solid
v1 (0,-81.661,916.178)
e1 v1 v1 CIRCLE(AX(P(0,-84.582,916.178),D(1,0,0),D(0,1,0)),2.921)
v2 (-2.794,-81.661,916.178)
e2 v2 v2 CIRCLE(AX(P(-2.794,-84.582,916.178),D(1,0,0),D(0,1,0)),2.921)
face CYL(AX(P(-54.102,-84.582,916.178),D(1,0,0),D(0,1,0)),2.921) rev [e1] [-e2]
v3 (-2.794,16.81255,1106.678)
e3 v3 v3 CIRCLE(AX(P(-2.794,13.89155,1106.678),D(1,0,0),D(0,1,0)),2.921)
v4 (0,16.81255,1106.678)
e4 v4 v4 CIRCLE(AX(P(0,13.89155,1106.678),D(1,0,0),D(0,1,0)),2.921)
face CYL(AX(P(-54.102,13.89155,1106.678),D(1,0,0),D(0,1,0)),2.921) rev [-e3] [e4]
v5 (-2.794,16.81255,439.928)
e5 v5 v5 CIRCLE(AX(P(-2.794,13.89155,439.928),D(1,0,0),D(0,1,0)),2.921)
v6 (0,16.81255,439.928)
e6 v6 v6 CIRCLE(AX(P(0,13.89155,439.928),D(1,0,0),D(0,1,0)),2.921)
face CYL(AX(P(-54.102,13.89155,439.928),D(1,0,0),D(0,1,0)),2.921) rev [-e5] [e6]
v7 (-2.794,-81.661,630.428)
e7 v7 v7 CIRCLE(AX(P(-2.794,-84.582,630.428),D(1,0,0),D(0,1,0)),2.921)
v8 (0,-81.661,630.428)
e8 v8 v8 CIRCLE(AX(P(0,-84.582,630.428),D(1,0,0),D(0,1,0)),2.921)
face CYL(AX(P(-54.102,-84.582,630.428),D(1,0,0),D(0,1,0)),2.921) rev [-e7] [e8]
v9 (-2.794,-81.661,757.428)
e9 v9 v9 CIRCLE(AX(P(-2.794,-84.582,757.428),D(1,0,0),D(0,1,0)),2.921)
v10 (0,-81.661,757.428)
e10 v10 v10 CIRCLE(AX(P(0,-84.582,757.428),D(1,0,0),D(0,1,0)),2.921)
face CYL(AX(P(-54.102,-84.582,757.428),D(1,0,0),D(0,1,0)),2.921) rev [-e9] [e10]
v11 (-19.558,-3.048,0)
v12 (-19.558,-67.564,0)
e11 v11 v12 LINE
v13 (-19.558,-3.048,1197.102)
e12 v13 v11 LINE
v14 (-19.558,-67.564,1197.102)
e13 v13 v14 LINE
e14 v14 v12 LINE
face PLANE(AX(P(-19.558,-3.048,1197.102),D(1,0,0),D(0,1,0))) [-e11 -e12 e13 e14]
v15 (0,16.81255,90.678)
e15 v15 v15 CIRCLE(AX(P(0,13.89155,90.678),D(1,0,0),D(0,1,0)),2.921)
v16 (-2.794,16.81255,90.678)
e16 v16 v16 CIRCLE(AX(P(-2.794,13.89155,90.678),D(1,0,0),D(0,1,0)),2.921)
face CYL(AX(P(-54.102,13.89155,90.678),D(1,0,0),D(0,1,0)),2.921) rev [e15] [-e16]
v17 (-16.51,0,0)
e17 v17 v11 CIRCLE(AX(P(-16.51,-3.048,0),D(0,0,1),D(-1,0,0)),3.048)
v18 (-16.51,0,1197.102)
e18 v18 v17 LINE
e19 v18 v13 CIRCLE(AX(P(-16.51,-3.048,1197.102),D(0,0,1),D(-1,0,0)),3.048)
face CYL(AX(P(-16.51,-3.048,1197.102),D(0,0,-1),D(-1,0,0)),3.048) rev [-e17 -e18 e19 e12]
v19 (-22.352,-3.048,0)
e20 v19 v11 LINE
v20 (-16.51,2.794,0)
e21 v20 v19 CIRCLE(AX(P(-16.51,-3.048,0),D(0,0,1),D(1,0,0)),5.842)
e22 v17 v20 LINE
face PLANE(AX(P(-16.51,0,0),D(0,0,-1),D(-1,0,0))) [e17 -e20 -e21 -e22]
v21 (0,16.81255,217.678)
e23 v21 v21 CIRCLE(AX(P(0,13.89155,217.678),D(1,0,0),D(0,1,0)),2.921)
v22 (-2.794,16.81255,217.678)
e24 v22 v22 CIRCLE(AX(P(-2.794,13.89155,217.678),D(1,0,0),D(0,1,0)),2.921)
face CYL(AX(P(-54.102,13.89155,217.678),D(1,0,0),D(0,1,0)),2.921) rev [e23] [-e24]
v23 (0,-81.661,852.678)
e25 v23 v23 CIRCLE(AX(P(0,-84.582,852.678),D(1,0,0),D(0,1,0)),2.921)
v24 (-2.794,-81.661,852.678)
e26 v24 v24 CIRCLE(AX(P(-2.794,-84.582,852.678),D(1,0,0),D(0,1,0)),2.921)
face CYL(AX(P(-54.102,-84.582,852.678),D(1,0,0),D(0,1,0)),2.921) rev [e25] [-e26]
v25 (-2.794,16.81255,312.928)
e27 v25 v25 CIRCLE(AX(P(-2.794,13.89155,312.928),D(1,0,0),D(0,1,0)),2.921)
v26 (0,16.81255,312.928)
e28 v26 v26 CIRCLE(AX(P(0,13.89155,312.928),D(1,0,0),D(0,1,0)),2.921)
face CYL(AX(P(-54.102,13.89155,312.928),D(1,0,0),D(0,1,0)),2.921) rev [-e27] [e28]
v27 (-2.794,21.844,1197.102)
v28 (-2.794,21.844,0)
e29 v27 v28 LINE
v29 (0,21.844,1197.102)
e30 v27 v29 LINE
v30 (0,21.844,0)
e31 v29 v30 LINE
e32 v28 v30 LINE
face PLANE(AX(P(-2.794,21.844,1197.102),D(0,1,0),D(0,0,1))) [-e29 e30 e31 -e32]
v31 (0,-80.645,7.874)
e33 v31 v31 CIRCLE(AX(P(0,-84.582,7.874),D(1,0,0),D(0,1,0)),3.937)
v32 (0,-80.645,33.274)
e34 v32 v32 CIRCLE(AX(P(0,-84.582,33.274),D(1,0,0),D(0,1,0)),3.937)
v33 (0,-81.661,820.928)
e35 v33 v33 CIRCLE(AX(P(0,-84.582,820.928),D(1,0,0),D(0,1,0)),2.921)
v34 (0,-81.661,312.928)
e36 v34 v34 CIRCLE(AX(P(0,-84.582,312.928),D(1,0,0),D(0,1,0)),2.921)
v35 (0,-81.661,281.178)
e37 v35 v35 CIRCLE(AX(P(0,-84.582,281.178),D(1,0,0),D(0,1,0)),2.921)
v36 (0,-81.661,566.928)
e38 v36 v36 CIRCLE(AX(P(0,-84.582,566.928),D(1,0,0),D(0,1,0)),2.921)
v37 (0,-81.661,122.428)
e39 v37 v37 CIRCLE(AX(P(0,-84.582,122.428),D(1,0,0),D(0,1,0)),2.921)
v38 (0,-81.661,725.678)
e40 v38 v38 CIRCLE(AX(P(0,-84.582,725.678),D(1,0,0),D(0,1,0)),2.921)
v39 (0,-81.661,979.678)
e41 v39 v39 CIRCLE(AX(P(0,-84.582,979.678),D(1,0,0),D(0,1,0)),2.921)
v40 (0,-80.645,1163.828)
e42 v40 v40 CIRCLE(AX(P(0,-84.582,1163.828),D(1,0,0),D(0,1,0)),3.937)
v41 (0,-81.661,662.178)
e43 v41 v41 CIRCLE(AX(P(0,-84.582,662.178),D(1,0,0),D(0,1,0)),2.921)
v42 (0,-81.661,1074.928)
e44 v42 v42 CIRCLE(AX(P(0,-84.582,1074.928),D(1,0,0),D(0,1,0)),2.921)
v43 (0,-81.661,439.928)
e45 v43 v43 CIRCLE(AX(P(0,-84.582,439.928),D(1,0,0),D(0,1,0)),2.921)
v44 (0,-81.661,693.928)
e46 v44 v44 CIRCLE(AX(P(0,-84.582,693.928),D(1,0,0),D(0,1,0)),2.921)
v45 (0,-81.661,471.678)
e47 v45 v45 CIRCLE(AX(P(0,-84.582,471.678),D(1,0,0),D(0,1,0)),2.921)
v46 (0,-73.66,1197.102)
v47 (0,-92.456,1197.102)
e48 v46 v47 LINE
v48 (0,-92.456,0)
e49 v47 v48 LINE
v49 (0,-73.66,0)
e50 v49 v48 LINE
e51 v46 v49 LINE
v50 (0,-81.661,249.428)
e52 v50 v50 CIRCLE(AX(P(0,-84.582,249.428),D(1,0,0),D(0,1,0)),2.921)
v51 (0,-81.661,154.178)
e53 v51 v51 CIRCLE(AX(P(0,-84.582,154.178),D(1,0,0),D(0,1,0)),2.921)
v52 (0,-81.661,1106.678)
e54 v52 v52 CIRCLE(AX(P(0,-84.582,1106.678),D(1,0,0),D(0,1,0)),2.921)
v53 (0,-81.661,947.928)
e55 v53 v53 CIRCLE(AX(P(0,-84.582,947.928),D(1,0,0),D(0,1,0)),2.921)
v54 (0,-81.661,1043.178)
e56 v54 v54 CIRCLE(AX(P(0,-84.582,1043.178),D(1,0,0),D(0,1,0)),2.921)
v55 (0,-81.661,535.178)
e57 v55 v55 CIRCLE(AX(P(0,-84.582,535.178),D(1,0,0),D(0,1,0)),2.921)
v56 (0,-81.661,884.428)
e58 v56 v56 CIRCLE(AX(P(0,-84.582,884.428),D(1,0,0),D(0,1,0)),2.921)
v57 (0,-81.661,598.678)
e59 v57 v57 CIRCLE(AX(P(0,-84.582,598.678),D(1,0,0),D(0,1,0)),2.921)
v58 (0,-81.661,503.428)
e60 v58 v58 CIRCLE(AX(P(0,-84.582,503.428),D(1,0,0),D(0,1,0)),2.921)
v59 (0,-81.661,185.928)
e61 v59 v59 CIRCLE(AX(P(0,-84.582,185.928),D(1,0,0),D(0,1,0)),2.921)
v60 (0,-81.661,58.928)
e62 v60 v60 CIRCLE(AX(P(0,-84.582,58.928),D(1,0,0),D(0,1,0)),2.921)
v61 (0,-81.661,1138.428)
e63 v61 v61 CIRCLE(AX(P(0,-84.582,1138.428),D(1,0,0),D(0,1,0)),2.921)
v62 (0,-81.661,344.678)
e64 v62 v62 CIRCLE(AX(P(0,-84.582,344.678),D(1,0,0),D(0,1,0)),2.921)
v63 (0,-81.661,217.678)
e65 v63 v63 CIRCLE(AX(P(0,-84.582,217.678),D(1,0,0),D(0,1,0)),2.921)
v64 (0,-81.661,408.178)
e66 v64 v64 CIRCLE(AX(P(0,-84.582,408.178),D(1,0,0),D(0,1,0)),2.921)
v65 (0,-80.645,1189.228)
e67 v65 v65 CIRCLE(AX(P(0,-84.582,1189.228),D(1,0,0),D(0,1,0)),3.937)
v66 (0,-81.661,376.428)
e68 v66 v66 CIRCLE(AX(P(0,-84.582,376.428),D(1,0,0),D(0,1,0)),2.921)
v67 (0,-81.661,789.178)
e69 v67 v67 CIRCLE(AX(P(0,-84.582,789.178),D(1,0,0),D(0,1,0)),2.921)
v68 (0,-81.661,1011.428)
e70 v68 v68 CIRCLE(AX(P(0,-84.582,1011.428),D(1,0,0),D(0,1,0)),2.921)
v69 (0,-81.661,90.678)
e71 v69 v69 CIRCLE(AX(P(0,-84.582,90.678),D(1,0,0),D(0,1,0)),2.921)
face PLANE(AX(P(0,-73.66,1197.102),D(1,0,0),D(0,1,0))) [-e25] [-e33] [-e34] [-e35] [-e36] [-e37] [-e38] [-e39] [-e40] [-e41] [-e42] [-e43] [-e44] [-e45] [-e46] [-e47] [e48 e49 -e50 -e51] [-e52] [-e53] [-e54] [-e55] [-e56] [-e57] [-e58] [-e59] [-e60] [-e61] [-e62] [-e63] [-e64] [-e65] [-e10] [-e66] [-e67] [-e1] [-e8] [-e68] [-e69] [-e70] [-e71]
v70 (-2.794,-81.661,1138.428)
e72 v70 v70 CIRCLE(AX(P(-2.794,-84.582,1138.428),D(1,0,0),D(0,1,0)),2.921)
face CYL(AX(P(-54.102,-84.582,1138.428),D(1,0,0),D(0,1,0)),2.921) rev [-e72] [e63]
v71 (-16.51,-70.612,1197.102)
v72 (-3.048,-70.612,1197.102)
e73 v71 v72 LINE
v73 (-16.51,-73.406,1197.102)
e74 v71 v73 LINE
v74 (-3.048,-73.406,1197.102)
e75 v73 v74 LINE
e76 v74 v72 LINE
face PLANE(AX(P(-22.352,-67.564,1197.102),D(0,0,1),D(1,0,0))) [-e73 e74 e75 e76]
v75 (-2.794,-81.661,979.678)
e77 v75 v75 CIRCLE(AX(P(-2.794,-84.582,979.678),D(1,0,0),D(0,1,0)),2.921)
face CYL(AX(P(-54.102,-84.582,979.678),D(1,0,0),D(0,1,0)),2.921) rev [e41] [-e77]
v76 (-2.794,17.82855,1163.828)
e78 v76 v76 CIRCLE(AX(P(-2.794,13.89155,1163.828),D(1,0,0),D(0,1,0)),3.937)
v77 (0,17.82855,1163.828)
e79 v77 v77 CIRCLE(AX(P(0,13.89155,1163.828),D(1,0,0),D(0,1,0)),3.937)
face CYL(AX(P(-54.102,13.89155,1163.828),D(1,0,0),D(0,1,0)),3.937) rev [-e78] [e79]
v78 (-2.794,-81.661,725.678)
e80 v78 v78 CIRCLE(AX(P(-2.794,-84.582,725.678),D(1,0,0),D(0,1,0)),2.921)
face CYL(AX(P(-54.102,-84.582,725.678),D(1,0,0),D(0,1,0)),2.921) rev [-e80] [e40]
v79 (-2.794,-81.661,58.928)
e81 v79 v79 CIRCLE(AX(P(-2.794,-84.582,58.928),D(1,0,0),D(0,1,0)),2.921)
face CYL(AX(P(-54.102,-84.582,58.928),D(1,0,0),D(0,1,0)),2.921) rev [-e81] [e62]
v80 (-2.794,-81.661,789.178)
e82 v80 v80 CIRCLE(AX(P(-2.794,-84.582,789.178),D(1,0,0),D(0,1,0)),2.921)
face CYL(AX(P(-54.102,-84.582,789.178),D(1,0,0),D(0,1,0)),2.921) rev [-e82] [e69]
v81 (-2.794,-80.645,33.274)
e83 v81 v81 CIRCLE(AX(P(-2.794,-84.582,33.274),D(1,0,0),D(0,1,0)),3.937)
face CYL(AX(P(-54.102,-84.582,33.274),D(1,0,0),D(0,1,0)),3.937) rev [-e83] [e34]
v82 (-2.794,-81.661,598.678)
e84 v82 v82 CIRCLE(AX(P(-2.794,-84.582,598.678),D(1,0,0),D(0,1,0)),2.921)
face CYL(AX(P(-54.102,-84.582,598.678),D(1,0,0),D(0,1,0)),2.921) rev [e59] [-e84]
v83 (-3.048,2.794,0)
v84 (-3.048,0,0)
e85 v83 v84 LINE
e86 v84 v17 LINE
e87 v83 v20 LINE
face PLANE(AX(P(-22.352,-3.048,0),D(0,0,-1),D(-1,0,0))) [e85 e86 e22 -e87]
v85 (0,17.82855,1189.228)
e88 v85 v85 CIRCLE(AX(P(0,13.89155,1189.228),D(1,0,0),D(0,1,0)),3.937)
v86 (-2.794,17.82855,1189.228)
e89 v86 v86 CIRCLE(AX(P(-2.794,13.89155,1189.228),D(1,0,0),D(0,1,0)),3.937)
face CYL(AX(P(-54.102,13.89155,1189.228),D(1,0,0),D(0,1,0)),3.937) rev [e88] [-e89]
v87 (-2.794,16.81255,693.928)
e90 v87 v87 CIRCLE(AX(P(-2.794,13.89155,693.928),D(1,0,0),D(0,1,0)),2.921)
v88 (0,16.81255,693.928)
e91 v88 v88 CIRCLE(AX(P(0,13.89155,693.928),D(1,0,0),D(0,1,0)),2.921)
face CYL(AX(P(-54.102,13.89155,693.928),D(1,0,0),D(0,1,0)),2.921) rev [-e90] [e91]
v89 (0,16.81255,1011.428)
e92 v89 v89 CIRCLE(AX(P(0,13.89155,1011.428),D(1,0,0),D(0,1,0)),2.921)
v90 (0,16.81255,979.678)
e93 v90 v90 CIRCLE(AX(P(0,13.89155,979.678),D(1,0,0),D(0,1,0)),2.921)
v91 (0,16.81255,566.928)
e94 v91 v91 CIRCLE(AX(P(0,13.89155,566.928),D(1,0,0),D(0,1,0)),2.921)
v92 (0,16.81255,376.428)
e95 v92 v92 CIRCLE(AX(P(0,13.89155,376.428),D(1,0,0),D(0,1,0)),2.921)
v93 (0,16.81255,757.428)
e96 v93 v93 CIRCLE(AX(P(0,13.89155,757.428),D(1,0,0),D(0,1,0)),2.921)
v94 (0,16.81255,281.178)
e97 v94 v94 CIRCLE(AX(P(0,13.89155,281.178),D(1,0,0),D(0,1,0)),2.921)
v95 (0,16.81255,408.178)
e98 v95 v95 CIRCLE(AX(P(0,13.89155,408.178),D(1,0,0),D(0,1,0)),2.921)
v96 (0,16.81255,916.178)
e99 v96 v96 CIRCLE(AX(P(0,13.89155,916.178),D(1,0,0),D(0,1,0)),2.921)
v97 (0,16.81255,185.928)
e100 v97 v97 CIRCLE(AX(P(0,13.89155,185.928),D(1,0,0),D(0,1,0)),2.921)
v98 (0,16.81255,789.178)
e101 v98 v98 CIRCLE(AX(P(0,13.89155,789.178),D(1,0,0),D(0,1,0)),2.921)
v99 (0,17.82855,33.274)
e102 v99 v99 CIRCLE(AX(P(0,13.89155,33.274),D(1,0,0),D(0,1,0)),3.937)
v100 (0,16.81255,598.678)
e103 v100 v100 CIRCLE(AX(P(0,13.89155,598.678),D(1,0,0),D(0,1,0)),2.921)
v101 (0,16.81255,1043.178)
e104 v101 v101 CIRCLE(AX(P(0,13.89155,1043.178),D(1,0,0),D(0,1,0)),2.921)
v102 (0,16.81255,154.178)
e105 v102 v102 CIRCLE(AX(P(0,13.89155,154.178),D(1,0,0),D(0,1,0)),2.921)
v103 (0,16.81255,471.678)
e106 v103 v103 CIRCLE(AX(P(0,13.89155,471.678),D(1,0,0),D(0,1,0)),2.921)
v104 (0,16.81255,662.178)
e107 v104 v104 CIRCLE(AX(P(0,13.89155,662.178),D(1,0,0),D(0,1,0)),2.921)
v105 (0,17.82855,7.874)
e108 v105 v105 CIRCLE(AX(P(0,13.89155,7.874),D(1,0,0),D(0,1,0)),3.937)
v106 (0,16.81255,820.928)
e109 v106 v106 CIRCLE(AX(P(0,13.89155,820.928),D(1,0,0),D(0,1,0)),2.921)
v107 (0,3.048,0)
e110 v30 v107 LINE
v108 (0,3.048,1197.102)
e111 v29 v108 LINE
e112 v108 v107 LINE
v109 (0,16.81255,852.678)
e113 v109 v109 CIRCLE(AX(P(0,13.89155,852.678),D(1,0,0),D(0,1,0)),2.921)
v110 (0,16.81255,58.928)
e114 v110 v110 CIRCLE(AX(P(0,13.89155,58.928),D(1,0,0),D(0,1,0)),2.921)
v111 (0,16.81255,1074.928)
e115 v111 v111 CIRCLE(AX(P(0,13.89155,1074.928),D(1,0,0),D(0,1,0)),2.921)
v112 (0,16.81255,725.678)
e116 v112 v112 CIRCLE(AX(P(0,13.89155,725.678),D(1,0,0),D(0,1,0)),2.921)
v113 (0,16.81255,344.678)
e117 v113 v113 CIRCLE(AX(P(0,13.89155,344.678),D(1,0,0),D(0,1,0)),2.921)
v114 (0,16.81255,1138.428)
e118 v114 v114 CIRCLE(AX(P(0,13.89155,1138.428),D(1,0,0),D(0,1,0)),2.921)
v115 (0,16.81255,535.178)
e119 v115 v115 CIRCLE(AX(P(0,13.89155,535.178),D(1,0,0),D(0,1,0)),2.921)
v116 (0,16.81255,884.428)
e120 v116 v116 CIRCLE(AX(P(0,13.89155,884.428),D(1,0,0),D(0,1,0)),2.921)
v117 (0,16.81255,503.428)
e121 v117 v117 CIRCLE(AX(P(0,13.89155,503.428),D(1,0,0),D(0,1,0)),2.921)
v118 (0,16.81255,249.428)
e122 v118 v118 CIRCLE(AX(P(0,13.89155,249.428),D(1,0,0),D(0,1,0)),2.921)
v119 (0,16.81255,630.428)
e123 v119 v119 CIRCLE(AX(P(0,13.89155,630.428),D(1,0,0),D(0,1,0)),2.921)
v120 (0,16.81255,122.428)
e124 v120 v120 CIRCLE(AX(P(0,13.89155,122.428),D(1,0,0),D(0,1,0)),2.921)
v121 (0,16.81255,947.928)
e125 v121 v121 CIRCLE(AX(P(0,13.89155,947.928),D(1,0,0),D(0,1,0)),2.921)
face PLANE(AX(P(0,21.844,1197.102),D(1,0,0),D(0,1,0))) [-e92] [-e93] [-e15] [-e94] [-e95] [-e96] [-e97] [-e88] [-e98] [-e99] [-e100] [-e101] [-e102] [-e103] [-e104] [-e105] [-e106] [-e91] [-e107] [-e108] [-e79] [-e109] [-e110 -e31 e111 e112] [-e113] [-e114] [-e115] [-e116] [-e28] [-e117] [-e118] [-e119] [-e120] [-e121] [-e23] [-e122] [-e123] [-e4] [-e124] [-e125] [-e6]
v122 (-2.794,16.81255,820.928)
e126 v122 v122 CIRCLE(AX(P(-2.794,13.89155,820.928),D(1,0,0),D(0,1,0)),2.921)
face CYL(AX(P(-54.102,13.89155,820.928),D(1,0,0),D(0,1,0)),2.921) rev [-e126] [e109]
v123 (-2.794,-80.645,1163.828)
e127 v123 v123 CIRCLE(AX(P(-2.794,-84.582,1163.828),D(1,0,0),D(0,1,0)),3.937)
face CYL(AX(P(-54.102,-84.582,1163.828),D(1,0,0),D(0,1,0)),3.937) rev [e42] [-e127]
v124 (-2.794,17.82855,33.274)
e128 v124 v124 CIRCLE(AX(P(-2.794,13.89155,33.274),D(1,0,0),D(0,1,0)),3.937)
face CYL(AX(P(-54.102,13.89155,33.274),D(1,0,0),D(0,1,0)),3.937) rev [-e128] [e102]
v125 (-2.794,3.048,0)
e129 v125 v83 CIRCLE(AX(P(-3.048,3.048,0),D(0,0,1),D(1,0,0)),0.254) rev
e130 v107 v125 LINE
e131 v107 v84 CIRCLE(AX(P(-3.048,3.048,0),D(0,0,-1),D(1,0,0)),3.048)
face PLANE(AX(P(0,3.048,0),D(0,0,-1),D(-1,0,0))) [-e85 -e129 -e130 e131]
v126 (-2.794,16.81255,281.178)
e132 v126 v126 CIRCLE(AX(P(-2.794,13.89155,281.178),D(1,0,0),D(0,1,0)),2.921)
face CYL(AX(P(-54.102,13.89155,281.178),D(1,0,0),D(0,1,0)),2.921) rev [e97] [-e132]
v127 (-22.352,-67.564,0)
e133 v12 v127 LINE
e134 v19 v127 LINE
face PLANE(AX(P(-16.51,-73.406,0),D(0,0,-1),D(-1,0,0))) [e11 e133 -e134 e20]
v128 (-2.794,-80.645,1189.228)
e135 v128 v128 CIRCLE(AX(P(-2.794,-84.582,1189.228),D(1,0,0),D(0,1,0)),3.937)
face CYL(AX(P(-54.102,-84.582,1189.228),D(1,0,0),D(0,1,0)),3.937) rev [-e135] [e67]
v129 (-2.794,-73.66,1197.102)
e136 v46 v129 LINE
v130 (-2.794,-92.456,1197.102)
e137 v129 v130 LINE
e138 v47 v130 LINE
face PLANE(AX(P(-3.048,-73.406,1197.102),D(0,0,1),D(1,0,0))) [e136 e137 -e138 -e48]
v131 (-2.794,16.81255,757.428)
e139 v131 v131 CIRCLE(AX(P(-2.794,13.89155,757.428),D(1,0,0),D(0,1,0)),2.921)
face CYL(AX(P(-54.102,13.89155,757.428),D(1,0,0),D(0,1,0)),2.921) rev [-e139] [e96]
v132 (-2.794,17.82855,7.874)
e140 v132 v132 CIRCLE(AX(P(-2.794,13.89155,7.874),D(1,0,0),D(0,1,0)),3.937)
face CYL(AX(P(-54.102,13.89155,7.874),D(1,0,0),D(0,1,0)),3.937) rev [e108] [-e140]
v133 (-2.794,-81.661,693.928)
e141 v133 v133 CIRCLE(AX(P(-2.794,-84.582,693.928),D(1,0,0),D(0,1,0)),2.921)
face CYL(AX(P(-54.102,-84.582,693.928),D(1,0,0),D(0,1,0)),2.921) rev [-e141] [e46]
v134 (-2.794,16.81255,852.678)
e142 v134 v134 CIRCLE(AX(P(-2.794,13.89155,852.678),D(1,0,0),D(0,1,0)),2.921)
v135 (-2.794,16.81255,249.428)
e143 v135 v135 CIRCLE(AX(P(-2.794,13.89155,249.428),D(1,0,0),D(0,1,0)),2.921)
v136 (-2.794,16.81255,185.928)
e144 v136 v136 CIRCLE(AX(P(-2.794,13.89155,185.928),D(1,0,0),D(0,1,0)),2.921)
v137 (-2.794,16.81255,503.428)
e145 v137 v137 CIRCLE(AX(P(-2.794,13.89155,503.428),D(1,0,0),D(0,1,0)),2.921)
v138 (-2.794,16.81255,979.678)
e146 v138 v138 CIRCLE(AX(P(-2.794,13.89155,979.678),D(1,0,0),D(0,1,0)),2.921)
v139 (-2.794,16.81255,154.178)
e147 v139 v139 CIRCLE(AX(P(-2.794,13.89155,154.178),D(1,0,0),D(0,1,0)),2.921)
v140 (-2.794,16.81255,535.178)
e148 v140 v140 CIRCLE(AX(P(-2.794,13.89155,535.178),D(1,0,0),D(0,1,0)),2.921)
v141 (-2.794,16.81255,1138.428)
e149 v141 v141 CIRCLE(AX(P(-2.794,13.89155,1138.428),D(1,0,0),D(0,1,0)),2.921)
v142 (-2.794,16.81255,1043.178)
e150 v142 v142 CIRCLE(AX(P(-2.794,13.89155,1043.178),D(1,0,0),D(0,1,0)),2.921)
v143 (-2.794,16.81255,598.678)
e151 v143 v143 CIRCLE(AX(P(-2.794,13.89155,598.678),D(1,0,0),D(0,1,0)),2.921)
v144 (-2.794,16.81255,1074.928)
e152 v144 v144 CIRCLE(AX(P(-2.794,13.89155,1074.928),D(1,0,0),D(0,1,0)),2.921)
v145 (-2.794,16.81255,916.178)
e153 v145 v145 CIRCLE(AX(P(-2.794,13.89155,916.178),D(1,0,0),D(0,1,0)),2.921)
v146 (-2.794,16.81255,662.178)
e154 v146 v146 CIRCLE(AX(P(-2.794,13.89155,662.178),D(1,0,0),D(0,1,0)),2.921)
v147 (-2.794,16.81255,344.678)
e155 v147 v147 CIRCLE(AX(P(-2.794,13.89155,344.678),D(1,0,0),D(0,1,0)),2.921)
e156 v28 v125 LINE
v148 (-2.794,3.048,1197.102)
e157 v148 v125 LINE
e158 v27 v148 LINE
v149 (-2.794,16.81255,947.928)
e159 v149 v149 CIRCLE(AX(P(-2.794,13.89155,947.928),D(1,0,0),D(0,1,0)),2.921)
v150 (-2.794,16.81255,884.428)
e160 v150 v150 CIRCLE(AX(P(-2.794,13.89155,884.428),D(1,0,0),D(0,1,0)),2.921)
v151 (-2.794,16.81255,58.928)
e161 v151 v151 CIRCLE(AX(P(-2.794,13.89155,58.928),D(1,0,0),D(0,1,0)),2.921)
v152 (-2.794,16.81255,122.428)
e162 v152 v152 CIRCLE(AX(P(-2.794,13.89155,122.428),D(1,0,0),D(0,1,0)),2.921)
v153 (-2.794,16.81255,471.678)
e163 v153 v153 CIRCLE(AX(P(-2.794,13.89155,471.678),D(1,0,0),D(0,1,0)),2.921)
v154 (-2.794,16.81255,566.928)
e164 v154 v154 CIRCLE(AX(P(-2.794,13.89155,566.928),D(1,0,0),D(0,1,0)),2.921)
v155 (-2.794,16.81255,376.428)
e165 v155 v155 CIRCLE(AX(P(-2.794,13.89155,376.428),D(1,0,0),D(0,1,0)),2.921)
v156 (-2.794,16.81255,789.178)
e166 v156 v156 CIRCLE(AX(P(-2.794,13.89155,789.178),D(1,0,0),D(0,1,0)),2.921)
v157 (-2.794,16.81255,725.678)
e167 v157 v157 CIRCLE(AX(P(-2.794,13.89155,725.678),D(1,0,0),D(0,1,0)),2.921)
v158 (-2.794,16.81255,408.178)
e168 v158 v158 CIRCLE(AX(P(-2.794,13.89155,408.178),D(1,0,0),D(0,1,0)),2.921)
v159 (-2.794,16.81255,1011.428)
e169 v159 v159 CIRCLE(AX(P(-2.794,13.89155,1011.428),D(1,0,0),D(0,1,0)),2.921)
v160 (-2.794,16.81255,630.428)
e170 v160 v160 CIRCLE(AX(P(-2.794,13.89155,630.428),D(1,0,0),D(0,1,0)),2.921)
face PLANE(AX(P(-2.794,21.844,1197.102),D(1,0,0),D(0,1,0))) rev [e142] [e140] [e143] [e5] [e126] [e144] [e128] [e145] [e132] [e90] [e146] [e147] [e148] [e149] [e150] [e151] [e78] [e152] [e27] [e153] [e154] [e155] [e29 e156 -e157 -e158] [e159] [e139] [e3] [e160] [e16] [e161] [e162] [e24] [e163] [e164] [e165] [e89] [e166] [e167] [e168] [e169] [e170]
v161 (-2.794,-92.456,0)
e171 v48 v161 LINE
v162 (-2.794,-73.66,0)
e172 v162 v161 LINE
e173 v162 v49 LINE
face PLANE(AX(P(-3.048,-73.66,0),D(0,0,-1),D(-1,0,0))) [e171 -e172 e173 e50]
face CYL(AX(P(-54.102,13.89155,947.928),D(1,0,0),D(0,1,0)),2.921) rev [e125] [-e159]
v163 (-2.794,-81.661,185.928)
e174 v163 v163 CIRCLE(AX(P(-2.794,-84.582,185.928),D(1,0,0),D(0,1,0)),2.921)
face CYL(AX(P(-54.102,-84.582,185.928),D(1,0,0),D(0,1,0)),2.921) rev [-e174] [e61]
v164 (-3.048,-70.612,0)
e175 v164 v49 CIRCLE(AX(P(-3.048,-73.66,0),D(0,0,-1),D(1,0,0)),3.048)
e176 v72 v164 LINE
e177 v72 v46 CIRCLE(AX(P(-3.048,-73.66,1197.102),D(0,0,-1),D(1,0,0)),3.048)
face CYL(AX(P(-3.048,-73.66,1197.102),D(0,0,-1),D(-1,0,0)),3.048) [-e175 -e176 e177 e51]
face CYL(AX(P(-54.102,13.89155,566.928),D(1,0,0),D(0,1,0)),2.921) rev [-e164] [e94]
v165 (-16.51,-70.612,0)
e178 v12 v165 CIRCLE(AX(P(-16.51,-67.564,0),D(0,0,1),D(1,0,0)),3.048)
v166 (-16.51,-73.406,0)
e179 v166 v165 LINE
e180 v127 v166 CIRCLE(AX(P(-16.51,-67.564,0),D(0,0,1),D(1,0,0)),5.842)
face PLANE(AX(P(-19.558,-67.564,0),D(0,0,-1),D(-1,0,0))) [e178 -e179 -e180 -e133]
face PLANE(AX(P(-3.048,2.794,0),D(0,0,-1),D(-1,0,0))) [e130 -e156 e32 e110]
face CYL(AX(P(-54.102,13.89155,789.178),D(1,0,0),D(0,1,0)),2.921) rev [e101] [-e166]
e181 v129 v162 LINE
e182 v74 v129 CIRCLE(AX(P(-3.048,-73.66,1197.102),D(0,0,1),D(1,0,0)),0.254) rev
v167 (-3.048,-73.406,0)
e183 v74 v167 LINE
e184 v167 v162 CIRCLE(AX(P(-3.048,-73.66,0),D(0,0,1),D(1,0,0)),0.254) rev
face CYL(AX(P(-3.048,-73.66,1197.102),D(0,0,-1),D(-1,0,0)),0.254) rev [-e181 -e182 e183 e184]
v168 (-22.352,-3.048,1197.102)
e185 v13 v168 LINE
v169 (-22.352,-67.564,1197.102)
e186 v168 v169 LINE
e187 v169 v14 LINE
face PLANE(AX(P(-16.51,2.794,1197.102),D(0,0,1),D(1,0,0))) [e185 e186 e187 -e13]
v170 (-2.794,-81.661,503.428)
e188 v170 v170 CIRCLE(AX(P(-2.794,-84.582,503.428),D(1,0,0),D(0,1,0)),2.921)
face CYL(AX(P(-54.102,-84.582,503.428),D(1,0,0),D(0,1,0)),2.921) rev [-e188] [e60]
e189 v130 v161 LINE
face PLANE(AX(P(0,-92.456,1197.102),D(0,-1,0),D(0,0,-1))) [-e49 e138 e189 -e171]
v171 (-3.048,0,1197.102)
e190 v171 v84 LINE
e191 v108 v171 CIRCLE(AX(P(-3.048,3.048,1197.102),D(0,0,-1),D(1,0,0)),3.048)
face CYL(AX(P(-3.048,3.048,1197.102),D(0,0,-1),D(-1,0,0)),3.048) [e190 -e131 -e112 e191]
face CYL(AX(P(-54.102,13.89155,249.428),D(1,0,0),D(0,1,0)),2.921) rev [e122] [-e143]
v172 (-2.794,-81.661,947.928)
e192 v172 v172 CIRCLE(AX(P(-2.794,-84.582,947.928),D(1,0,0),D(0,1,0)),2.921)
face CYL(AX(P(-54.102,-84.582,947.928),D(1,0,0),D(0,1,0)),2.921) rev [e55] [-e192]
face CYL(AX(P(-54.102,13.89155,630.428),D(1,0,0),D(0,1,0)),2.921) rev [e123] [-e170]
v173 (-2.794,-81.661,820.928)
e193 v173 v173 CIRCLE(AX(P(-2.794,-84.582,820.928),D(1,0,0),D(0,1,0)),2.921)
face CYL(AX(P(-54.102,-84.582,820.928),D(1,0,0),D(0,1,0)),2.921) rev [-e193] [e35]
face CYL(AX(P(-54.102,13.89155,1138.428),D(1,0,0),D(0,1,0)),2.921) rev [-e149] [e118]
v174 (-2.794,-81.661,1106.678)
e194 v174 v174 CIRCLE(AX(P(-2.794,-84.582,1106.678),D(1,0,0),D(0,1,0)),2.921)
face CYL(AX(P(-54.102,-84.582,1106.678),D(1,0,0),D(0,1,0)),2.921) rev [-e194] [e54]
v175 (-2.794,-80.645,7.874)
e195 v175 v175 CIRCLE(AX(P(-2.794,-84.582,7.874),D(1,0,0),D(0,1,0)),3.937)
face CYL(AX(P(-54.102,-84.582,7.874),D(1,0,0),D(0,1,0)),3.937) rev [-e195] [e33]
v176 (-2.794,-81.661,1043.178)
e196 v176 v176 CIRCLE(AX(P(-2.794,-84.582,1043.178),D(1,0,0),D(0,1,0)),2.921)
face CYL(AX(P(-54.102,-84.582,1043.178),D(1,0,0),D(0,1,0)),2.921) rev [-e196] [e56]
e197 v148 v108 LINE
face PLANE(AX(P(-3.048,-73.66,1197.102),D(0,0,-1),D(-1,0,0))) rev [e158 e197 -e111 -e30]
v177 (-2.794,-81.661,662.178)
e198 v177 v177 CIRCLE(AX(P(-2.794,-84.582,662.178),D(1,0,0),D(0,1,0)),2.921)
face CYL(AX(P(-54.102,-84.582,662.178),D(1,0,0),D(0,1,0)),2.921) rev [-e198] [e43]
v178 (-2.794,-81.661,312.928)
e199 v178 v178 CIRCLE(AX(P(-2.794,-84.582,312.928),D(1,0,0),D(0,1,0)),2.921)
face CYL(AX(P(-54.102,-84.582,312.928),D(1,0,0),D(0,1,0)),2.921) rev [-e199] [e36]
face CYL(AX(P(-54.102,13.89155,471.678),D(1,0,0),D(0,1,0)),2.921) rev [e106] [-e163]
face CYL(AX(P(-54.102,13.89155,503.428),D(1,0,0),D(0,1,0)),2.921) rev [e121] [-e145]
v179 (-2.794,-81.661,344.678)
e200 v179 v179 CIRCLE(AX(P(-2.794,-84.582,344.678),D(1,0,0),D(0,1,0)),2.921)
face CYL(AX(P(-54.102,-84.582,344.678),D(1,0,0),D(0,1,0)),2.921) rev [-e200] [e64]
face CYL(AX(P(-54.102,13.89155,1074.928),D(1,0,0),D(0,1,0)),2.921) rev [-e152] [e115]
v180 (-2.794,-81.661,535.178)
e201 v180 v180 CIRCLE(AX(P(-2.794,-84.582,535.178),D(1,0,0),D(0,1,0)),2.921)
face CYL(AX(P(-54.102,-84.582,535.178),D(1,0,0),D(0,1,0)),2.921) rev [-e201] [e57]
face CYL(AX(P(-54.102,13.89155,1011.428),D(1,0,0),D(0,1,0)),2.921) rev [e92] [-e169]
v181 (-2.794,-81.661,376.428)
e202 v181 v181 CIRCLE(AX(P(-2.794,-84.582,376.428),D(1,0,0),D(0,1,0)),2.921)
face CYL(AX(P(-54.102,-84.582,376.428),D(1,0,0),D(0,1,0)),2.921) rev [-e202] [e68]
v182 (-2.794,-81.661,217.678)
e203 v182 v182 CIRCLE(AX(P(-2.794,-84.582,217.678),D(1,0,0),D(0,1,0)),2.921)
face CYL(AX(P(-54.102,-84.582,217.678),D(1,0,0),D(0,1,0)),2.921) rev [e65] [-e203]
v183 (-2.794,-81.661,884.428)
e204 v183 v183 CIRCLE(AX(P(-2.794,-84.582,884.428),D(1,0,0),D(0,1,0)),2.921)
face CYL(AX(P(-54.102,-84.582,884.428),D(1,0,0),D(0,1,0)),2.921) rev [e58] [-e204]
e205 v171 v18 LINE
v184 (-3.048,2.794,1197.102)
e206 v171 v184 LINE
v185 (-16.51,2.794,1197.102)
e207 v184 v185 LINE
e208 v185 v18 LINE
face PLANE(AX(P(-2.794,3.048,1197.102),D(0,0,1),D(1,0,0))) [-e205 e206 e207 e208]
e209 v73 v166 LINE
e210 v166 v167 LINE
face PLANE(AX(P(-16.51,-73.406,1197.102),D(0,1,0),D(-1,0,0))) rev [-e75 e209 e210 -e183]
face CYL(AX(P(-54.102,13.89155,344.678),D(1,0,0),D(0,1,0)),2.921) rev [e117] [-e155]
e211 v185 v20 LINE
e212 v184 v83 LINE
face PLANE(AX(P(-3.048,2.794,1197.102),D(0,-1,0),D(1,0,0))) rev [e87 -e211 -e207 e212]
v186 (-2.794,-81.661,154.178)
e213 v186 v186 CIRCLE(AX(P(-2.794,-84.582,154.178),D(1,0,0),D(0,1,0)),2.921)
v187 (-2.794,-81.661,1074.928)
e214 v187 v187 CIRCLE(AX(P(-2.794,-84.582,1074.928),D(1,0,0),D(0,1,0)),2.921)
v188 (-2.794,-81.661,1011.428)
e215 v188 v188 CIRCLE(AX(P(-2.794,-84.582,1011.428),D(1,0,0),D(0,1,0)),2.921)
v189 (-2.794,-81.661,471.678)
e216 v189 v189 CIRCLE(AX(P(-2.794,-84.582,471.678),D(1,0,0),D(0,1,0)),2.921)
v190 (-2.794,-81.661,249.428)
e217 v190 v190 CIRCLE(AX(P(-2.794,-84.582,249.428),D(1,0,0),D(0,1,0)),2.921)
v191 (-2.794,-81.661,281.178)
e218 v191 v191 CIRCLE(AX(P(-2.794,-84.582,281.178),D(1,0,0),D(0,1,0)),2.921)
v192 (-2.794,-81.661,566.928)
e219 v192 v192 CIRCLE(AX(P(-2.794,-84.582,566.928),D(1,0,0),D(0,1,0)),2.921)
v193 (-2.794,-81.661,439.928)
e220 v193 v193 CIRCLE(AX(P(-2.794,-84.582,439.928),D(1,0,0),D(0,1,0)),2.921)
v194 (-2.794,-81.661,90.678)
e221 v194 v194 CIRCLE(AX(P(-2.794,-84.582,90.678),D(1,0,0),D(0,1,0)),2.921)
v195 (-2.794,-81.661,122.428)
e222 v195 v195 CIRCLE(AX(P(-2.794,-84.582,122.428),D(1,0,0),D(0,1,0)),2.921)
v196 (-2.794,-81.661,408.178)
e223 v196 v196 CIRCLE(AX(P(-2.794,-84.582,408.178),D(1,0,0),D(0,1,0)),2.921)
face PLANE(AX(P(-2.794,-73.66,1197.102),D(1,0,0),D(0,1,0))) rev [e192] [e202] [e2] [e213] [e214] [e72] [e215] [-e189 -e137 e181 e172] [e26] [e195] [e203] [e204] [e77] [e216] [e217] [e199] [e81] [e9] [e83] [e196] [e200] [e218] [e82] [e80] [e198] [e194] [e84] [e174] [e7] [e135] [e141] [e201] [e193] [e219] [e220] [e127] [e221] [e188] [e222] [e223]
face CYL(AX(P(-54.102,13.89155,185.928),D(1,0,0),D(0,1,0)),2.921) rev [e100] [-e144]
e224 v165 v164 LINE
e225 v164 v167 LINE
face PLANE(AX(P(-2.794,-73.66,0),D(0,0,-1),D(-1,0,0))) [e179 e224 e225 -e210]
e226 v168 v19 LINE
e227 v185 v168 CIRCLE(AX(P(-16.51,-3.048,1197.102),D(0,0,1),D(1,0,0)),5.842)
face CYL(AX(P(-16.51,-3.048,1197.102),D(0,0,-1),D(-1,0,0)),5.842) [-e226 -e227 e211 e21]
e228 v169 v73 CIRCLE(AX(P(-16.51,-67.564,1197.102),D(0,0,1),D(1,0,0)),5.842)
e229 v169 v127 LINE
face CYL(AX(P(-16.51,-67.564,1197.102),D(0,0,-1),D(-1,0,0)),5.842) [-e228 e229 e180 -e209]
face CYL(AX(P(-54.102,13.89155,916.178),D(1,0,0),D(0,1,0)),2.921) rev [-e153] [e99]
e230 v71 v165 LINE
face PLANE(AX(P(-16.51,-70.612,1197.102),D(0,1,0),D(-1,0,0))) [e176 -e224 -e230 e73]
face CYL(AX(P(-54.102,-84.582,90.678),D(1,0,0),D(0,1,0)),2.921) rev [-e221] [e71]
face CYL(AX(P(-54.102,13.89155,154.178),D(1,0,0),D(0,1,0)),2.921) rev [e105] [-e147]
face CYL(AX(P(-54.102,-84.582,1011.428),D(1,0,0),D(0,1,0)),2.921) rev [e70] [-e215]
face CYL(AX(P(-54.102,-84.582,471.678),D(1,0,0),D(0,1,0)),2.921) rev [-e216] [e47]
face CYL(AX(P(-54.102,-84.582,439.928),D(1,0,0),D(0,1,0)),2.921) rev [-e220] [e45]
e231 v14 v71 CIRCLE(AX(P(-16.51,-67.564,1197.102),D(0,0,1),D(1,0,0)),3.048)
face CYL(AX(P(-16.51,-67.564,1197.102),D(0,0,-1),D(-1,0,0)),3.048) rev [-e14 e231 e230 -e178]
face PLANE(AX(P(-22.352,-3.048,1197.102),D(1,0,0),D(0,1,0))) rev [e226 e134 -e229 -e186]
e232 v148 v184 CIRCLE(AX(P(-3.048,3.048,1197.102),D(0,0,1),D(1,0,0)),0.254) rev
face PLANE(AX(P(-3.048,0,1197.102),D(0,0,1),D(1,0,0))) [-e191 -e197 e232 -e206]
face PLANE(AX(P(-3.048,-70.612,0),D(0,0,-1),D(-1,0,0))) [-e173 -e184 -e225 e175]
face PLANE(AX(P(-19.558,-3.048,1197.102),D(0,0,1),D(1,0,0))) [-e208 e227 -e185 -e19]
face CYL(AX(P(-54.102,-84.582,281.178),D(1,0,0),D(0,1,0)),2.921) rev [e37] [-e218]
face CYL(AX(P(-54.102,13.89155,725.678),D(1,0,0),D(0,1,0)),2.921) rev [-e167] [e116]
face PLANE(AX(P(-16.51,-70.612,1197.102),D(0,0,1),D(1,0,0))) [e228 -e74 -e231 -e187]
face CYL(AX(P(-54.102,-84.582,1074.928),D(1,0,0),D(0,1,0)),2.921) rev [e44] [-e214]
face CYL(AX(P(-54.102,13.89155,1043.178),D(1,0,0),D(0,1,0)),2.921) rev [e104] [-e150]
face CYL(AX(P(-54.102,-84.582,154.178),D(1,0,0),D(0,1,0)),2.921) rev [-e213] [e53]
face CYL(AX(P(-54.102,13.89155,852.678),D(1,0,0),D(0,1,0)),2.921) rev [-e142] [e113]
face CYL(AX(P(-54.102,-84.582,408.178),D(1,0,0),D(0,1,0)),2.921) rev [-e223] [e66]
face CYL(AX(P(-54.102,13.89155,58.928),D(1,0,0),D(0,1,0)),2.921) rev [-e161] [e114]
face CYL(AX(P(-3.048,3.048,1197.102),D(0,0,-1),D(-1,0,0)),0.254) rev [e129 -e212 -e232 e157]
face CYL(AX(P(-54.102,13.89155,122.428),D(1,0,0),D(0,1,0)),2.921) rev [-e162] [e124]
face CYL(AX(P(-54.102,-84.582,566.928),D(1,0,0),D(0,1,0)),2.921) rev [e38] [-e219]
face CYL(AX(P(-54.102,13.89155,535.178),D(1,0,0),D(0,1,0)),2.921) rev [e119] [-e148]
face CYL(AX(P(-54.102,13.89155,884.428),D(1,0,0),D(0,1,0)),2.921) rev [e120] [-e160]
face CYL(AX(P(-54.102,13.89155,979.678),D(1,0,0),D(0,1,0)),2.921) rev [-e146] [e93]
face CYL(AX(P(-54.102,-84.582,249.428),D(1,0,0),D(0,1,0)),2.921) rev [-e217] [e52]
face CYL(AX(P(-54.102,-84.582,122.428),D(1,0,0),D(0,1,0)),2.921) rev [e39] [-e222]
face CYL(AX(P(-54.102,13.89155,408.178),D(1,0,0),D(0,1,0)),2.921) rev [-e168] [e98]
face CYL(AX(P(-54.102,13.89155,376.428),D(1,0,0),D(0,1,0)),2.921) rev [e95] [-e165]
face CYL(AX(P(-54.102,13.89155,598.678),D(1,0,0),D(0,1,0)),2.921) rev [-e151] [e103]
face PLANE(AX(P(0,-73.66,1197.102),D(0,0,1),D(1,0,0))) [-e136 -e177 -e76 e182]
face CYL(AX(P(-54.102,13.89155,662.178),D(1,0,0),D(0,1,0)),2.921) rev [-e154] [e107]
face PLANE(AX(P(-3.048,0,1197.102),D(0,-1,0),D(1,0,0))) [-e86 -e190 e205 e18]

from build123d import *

# Parameters (mm, degrees)
BRIDA_BASE5_DEPTH     = 1197.102
CROQUIS22_R           = 3.937
CORTAR_EXTRUIR1_DEPTH = 54.102
CROQUIS23_R           = 2.921
CORTAR_EXTRUIR2_DEPTH = 54.102


# Sheet-metal steps are written as plain solids
with BuildPart() as part:
    # Croquis1 → Brida base5 (new body)
    with BuildSketch(Plane.XY):
        with BuildLine():
            Line((0, 21.844), (0, 3.048))
            ThreePointArc((0, 3.048), (-0.892738531, 0.892738531), (-3.048, 0))
            Line((-3.048, 0), (-16.51, 0))
            ThreePointArc((-16.51, 0), (-18.665261469, -0.892738531), (-19.558, -3.048))
            Line((-19.558, -3.048), (-19.558, -67.564))
            ThreePointArc((-19.558, -67.564), (-18.665261469, -69.719261469), (-16.51, -70.612))
            Line((-16.51, -70.612), (-3.048, -70.612))
            ThreePointArc((-3.048, -70.612), (-0.892738531, -71.504738531), (0, -73.66))
            Line((0, -73.66), (0, -92.456))
            Line((0, -92.456), (-2.794, -92.456))
            Line((-2.794, -92.456), (-2.794, -73.66))
            ThreePointArc((-2.794, -73.66), (-2.868394878, -73.480394878), (-3.048, -73.406))
            Line((-3.048, -73.406), (-16.51, -73.406))
            ThreePointArc((-16.51, -73.406), (-20.640917816, -71.694917816), (-22.352, -67.564))
            Line((-22.352, -67.564), (-22.352, -3.048))
            ThreePointArc((-22.352, -3.048), (-20.640917816, 1.082917816), (-16.51, 2.794))
            Line((-16.51, 2.794), (-3.048, 2.794))
            ThreePointArc((-3.048, 2.794), (-2.868394878, 2.868394878), (-2.794, 3.048))
            Line((-2.794, 3.048), (-2.794, 21.844))
            Line((-2.794, 21.844), (0, 21.844))
        make_face()
    extrude(amount=BRIDA_BASE5_DEPTH)

    # Croquis22 → Cortar-Extruir1 (cut)
    with BuildSketch(Plane(origin=(0, 0, 0), x_dir=(0, 0, -1), z_dir=(1, 0, 0))):
        with Locations(Location((-1189.228, 13.891549634, 0), (0, 0, 90))):
            Circle(CROQUIS22_R)
        with Locations(Location((-1163.828, 13.891549634, 0), (0, 0, 90))):
            Circle(CROQUIS22_R)
        with Locations(Location((-1189.228, -84.582, 0), (0, 0, 90))):
            Circle(CROQUIS22_R)
        with Locations(Location((-1163.828, -84.582, 0), (0, 0, 90))):
            Circle(CROQUIS22_R)
        with Locations(Location((-7.874, 13.891549634, 0), (0, 0, 90))):
            Circle(CROQUIS22_R)
        with Locations(Location((-33.274, 13.891549634, 0), (0, 0, 90))):
            Circle(CROQUIS22_R)
        with Locations(Location((-7.874, -84.582, 0), (0, 0, 90))):
            Circle(CROQUIS22_R)
        with Locations(Location((-33.274, -84.582, 0), (0, 0, 90))):
            Circle(CROQUIS22_R)
    extrude(amount=-CORTAR_EXTRUIR1_DEPTH, mode=Mode.SUBTRACT)

    # Croquis23 → Cortar-Extruir2 (cut)
    with BuildSketch(Plane(origin=(0, 0, 0), x_dir=(0, 0, -1), z_dir=(1, 0, 0))):
        with Locations(Location((-1138.428, 13.891549634, 0), (0, 0, 90))):
            Circle(CROQUIS23_R)
        with Locations(Location((-1138.428, -84.582, 0), (0, 0, 90))):
            Circle(CROQUIS23_R)
        with Locations(Location((-1106.678, 13.891549634, 0), (0, 0, 90))):
            Circle(CROQUIS23_R)
        with Locations(Location((-1106.678, -84.582, 0), (0, 0, 90))):
            Circle(CROQUIS23_R)
        with Locations(Location((-1074.928, 13.891549634, 0), (0, 0, 90))):
            Circle(CROQUIS23_R)
        with Locations(Location((-1074.928, -84.582, 0), (0, 0, 90))):
            Circle(CROQUIS23_R)
        with Locations(Location((-1043.178, 13.891549634, 0), (0, 0, 90))):
            Circle(CROQUIS23_R)
        with Locations(Location((-1043.178, -84.582, 0), (0, 0, 90))):
            Circle(CROQUIS23_R)
        with Locations(Location((-1011.428, 13.891549634, 0), (0, 0, 90))):
            Circle(CROQUIS23_R)
        with Locations(Location((-1011.428, -84.582, 0), (0, 0, 90))):
            Circle(CROQUIS23_R)
        with Locations(Location((-979.678, 13.891549634, 0), (0, 0, 90))):
            Circle(CROQUIS23_R)
        with Locations(Location((-979.678, -84.582, 0), (0, 0, 90))):
            Circle(CROQUIS23_R)
        with Locations(Location((-947.928, 13.891549634, 0), (0, 0, 90))):
            Circle(CROQUIS23_R)
        with Locations(Location((-947.928, -84.582, 0), (0, 0, 90))):
            Circle(CROQUIS23_R)
        with Locations(Location((-916.178, 13.891549634, 0), (0, 0, 90))):
            Circle(CROQUIS23_R)
        with Locations(Location((-916.178, -84.582, 0), (0, 0, 90))):
            Circle(CROQUIS23_R)
        with Locations(Location((-884.428, 13.891549634, 0), (0, 0, 90))):
            Circle(CROQUIS23_R)
        with Locations(Location((-884.428, -84.582, 0), (0, 0, 90))):
            Circle(CROQUIS23_R)
        with Locations(Location((-852.678, 13.891549634, 0), (0, 0, 90))):
            Circle(CROQUIS23_R)
        with Locations(Location((-852.678, -84.582, 0), (0, 0, 90))):
            Circle(CROQUIS23_R)
        with Locations(Location((-820.928, 13.891549634, 0), (0, 0, 90))):
            Circle(CROQUIS23_R)
        with Locations(Location((-820.928, -84.582, 0), (0, 0, 90))):
            Circle(CROQUIS23_R)
        with Locations(Location((-789.178, 13.891549634, 0), (0, 0, 90))):
            Circle(CROQUIS23_R)
        with Locations(Location((-789.178, -84.582, 0), (0, 0, 90))):
            Circle(CROQUIS23_R)
        with Locations(Location((-757.428, 13.891549634, 0), (0, 0, 90))):
            Circle(CROQUIS23_R)
        with Locations(Location((-757.428, -84.582, 0), (0, 0, 90))):
            Circle(CROQUIS23_R)
        with Locations(Location((-725.678, 13.891549634, 0), (0, 0, 90))):
            Circle(CROQUIS23_R)
        with Locations(Location((-725.678, -84.582, 0), (0, 0, 90))):
            Circle(CROQUIS23_R)
        with Locations(Location((-693.928, 13.891549634, 0), (0, 0, 90))):
            Circle(CROQUIS23_R)
        with Locations(Location((-693.928, -84.582, 0), (0, 0, 90))):
            Circle(CROQUIS23_R)
        with Locations(Location((-662.178, 13.891549634, 0), (0, 0, 90))):
            Circle(CROQUIS23_R)
        with Locations(Location((-662.178, -84.582, 0), (0, 0, 90))):
            Circle(CROQUIS23_R)
        with Locations(Location((-630.428, 13.891549634, 0), (0, 0, 90))):
            Circle(CROQUIS23_R)
        with Locations(Location((-630.428, -84.582, 0), (0, 0, 90))):
            Circle(CROQUIS23_R)
        with Locations(Location((-598.678, 13.891549634, 0), (0, 0, 90))):
            Circle(CROQUIS23_R)
        with Locations(Location((-598.678, -84.582, 0), (0, 0, 90))):
            Circle(CROQUIS23_R)
        with Locations(Location((-566.928, 13.891549634, 0), (0, 0, 90))):
            Circle(CROQUIS23_R)
        with Locations(Location((-566.928, -84.582, 0), (0, 0, 90))):
            Circle(CROQUIS23_R)
        with Locations(Location((-535.178, 13.891549634, 0), (0, 0, 90))):
            Circle(CROQUIS23_R)
        with Locations(Location((-535.178, -84.582, 0), (0, 0, 90))):
            Circle(CROQUIS23_R)
        with Locations(Location((-503.428, 13.891549634, 0), (0, 0, 90))):
            Circle(CROQUIS23_R)
        with Locations(Location((-503.428, -84.582, 0), (0, 0, 90))):
            Circle(CROQUIS23_R)
        with Locations(Location((-471.678, 13.891549634, 0), (0, 0, 90))):
            Circle(CROQUIS23_R)
        with Locations(Location((-471.678, -84.582, 0), (0, 0, 90))):
            Circle(CROQUIS23_R)
        with Locations(Location((-439.928, 13.891549634, 0), (0, 0, 90))):
            Circle(CROQUIS23_R)
        with Locations(Location((-439.928, -84.582, 0), (0, 0, 90))):
            Circle(CROQUIS23_R)
        with Locations(Location((-408.178, 13.891549634, 0), (0, 0, 90))):
            Circle(CROQUIS23_R)
        with Locations(Location((-408.178, -84.582, 0), (0, 0, 90))):
            Circle(CROQUIS23_R)
        with Locations(Location((-376.428, 13.891549634, 0), (0, 0, 90))):
            Circle(CROQUIS23_R)
        with Locations(Location((-376.428, -84.582, 0), (0, 0, 90))):
            Circle(CROQUIS23_R)
        with Locations(Location((-344.678, 13.891549634, 0), (0, 0, 90))):
            Circle(CROQUIS23_R)
        with Locations(Location((-344.678, -84.582, 0), (0, 0, 90))):
            Circle(CROQUIS23_R)
        with Locations(Location((-312.928, 13.891549634, 0), (0, 0, 90))):
            Circle(CROQUIS23_R)
        with Locations(Location((-312.928, -84.582, 0), (0, 0, 90))):
            Circle(CROQUIS23_R)
        with Locations(Location((-281.178, 13.891549634, 0), (0, 0, 90))):
            Circle(CROQUIS23_R)
        with Locations(Location((-281.178, -84.582, 0), (0, 0, 90))):
            Circle(CROQUIS23_R)
        with Locations(Location((-249.428, 13.891549634, 0), (0, 0, 90))):
            Circle(CROQUIS23_R)
        with Locations(Location((-249.428, -84.582, 0), (0, 0, 90))):
            Circle(CROQUIS23_R)
        with Locations(Location((-217.678, 13.891549634, 0), (0, 0, 90))):
            Circle(CROQUIS23_R)
        with Locations(Location((-217.678, -84.582, 0), (0, 0, 90))):
            Circle(CROQUIS23_R)
        with Locations(Location((-185.928, 13.891549634, 0), (0, 0, 90))):
            Circle(CROQUIS23_R)
        with Locations(Location((-185.928, -84.582, 0), (0, 0, 90))):
            Circle(CROQUIS23_R)
        with Locations(Location((-154.178, 13.891549634, 0), (0, 0, 90))):
            Circle(CROQUIS23_R)
        with Locations(Location((-154.178, -84.582, 0), (0, 0, 90))):
            Circle(CROQUIS23_R)
        with Locations(Location((-122.428, 13.891549634, 0), (0, 0, 90))):
            Circle(CROQUIS23_R)
        with Locations(Location((-122.428, -84.582, 0), (0, 0, 90))):
            Circle(CROQUIS23_R)
        with Locations(Location((-90.678, 13.891549634, 0), (0, 0, 90))):
            Circle(CROQUIS23_R)
        with Locations(Location((-90.678, -84.582, 0), (0, 0, 90))):
            Circle(CROQUIS23_R)
        with Locations(Location((-58.928, 13.891549634, 0), (0, 0, 90))):
            Circle(CROQUIS23_R)
        with Locations(Location((-58.928, -84.582, 0), (0, 0, 90))):
            Circle(CROQUIS23_R)
    extrude(amount=-CORTAR_EXTRUIR2_DEPTH, mode=Mode.SUBTRACT)


solid = part.part
